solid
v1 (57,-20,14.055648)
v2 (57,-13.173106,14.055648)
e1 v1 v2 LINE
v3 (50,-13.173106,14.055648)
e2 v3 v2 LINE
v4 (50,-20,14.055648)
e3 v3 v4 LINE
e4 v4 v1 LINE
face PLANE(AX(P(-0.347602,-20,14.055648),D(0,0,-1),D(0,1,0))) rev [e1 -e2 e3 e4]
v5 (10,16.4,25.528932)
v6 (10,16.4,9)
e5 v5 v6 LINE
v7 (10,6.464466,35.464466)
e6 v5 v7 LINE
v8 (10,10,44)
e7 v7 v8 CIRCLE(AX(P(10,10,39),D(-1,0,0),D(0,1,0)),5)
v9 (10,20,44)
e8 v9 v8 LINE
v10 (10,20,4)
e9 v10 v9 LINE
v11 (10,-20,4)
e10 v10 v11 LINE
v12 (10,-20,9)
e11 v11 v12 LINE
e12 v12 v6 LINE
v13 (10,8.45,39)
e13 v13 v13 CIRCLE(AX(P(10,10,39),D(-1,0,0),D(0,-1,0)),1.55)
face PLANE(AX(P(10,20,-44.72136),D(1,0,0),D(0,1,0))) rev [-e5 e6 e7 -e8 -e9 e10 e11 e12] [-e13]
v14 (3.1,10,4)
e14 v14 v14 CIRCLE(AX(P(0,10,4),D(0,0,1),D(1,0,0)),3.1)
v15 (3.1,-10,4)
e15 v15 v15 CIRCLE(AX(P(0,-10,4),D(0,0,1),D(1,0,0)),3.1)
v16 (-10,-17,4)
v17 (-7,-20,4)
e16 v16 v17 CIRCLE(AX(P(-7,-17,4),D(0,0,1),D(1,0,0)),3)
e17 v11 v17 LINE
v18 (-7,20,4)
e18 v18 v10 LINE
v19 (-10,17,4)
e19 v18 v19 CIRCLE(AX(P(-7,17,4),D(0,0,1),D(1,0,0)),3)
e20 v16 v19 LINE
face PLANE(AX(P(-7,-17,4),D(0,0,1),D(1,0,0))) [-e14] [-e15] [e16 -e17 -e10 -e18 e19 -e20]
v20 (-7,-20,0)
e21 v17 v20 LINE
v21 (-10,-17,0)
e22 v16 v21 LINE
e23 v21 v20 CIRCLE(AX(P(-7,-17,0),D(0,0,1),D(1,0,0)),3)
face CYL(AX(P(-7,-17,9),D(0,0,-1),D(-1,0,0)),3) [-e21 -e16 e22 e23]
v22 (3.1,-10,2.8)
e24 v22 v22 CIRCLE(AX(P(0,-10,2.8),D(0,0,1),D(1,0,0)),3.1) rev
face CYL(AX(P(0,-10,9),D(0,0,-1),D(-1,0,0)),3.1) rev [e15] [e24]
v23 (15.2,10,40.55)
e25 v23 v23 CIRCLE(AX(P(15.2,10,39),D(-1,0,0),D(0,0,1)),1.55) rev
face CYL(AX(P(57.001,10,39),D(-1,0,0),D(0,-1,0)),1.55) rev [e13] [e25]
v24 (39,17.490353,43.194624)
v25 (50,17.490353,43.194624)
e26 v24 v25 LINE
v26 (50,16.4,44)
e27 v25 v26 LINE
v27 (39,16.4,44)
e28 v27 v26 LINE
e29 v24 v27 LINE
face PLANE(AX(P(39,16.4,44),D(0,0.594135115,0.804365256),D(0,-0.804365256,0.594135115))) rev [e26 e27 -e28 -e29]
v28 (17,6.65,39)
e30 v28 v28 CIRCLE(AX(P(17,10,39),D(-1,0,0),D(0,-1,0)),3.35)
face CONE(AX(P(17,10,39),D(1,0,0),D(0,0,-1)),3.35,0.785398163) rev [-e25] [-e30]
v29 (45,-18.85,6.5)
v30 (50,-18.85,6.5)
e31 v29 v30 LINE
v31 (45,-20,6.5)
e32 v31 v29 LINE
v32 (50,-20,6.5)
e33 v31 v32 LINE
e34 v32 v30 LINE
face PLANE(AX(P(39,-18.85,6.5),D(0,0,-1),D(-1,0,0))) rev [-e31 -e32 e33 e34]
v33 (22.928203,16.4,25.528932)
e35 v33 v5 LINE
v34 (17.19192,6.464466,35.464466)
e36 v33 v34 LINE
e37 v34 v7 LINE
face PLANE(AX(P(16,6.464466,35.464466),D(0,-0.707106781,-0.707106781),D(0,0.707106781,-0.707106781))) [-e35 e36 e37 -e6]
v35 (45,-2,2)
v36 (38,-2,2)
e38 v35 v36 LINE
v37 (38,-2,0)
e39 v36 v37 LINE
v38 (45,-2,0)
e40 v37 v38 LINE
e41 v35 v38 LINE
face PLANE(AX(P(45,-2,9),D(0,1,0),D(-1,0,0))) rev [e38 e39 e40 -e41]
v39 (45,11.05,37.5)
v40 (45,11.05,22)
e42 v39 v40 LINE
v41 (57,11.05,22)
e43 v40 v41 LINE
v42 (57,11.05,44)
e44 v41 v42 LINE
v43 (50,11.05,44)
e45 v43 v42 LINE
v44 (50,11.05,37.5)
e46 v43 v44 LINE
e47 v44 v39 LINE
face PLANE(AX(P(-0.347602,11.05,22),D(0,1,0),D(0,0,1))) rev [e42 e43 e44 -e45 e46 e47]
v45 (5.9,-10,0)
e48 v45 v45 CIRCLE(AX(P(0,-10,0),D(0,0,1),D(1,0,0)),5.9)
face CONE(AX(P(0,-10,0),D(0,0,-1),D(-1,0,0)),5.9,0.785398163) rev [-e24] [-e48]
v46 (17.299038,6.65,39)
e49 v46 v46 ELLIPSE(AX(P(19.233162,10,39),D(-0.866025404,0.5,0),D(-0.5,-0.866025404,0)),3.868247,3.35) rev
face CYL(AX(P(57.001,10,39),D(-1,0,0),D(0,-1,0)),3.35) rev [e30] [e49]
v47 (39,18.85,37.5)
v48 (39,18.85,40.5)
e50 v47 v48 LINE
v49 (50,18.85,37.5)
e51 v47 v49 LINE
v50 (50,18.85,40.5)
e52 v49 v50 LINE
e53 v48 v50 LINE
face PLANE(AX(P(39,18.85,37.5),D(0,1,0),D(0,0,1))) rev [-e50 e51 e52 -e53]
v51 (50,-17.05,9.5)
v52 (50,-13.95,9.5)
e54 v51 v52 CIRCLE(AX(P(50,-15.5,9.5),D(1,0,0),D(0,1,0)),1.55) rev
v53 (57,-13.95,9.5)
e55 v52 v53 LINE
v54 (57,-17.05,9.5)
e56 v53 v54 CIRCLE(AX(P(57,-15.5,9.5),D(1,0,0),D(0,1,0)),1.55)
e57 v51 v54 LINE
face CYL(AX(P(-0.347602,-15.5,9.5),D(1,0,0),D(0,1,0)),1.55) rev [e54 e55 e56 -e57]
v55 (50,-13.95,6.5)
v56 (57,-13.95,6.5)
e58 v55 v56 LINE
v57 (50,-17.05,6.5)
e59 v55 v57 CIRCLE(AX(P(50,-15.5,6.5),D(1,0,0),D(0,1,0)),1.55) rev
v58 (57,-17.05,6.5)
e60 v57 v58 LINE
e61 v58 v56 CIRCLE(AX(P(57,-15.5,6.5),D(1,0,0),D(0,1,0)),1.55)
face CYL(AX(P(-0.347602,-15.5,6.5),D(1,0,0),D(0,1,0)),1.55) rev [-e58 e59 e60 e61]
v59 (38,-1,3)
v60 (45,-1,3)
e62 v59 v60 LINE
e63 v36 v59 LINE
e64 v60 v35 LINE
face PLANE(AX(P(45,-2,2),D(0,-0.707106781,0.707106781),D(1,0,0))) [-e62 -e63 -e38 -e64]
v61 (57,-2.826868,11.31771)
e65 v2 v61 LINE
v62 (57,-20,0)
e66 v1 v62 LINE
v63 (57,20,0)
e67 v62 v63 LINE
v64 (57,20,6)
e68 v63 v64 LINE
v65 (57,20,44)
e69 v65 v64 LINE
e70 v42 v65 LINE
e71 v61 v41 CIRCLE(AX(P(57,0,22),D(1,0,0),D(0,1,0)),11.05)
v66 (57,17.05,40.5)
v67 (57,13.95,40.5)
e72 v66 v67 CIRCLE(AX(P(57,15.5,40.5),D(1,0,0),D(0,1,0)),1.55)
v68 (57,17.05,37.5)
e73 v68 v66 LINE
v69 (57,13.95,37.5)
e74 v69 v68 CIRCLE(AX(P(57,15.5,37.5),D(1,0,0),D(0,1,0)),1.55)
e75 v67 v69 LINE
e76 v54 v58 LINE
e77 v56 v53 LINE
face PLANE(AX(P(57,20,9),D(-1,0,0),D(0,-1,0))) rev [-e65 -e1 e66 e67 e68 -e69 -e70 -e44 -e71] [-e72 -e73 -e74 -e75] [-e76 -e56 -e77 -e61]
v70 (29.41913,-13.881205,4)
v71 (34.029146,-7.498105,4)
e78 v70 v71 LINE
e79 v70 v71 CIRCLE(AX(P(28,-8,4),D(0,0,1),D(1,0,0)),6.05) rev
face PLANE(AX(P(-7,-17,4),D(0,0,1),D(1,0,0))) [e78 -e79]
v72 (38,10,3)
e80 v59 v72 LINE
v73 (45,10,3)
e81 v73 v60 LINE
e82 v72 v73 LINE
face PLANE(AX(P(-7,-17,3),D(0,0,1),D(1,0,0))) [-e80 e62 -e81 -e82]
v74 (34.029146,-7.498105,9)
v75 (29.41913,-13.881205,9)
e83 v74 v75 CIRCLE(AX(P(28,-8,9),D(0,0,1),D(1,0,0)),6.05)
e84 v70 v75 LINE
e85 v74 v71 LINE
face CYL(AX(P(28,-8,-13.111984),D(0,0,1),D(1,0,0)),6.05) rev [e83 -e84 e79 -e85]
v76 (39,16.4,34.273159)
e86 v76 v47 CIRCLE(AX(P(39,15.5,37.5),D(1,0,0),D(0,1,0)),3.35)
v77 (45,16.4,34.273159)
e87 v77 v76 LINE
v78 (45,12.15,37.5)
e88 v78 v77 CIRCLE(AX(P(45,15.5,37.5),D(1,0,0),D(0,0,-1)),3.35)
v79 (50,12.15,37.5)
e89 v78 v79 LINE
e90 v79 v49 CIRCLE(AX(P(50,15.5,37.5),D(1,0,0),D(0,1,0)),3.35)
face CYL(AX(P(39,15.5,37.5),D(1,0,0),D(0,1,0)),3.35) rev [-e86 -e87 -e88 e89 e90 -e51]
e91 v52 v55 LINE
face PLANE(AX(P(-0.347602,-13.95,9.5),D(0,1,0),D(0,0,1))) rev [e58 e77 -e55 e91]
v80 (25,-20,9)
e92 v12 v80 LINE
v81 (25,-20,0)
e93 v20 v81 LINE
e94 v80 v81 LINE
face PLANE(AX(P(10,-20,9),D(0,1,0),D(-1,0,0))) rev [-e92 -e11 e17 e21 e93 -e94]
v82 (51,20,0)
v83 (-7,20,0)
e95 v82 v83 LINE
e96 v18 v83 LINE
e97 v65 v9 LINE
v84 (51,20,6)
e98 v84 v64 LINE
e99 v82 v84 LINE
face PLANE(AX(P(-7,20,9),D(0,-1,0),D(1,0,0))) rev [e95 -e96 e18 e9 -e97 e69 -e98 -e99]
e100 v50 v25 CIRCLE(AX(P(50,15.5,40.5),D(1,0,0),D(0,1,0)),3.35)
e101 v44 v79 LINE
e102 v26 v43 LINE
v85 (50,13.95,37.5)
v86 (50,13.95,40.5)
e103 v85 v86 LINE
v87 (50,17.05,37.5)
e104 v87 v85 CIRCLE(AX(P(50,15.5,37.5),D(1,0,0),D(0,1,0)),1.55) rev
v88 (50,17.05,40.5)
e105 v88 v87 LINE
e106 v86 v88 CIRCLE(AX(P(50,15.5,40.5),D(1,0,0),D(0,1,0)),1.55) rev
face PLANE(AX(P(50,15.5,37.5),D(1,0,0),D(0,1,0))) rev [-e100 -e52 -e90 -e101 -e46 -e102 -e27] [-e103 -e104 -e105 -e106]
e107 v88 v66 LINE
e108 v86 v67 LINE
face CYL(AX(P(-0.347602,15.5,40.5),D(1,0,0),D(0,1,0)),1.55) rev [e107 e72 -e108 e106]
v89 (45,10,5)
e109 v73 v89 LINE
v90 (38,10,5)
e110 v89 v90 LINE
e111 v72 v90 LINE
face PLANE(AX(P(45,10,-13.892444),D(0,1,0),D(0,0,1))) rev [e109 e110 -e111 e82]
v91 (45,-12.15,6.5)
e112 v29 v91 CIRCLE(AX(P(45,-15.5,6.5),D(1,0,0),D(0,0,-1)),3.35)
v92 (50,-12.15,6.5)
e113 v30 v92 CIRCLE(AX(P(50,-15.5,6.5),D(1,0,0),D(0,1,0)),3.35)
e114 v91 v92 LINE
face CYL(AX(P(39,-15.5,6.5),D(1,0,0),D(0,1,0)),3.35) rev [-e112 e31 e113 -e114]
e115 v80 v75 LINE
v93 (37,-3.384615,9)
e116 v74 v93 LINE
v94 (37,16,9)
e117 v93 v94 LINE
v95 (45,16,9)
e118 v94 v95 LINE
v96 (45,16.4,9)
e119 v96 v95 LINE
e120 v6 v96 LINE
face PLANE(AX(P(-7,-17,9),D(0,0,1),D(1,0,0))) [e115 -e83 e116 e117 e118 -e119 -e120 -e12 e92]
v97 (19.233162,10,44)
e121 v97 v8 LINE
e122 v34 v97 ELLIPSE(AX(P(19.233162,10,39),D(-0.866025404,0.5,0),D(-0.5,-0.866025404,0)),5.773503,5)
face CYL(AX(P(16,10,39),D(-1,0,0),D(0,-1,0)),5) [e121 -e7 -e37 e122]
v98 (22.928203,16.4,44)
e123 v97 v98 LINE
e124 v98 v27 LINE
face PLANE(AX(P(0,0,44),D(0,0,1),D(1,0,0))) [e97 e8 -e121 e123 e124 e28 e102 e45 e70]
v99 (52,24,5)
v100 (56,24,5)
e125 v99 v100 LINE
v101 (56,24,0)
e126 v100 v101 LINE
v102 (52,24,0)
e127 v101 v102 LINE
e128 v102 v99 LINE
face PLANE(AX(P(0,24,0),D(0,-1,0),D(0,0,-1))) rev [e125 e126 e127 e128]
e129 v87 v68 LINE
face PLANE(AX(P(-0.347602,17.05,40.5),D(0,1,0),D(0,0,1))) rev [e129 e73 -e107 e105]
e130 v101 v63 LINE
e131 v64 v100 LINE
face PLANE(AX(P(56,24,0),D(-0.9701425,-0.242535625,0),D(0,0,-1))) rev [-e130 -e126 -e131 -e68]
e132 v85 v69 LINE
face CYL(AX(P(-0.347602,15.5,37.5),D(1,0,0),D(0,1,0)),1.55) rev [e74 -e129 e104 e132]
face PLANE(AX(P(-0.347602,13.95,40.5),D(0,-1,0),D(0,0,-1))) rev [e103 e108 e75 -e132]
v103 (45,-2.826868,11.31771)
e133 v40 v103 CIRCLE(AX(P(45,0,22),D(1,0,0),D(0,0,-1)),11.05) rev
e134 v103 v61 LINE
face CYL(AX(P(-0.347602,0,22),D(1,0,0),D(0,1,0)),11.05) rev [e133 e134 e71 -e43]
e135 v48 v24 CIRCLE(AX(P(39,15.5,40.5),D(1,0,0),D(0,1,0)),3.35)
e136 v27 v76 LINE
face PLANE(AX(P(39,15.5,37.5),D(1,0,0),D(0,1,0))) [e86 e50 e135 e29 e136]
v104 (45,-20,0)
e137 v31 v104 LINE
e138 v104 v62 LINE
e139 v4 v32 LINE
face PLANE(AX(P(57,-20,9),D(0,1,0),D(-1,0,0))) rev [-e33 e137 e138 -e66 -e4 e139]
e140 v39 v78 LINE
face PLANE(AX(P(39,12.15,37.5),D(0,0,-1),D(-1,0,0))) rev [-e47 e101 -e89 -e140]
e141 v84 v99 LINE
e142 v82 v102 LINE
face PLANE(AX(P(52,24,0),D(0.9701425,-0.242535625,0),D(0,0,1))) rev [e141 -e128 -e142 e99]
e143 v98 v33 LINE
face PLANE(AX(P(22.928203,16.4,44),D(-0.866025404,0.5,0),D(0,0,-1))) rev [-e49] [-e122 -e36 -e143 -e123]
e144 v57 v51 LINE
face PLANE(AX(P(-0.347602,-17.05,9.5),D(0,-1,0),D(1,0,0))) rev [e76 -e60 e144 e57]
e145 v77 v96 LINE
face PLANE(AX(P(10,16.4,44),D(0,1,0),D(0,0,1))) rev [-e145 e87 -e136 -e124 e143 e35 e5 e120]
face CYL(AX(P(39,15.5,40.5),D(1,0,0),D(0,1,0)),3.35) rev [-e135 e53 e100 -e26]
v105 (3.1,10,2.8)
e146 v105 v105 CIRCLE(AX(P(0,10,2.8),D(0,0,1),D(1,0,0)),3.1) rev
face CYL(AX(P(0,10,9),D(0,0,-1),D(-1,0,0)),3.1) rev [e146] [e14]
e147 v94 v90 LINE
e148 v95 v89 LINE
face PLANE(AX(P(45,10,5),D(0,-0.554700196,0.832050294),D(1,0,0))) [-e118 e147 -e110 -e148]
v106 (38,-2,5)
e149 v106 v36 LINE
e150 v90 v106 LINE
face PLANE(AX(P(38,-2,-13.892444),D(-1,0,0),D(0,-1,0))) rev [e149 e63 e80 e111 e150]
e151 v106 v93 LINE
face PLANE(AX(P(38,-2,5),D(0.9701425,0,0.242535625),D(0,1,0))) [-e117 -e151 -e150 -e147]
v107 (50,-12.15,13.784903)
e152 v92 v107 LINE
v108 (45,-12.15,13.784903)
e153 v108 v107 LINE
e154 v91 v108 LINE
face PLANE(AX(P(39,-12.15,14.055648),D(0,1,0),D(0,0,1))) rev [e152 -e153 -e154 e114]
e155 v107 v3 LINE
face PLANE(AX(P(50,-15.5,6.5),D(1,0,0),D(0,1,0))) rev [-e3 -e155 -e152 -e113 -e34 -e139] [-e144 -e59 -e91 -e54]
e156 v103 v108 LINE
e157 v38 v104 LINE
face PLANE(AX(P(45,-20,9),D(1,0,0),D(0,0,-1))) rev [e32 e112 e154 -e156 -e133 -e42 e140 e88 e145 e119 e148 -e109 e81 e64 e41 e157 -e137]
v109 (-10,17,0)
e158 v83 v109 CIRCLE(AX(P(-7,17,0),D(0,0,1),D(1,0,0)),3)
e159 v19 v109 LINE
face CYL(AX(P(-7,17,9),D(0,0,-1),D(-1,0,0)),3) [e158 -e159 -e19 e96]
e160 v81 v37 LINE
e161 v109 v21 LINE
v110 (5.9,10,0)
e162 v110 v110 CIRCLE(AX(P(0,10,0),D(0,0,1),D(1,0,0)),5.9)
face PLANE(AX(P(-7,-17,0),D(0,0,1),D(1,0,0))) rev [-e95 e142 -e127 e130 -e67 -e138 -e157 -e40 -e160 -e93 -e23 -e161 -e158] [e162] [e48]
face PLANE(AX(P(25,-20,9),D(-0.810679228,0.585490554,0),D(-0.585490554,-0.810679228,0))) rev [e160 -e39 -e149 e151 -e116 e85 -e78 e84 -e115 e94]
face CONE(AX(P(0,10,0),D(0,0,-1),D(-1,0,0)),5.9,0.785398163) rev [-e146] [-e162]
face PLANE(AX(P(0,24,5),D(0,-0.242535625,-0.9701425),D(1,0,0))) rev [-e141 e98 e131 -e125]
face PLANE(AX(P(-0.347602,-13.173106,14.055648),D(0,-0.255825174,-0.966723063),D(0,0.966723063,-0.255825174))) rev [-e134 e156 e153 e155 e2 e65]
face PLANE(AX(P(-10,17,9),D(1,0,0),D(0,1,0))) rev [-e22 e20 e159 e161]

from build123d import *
from OCP.BRepFilletAPI import BRepFilletAPI_MakeChamfer

# Parameters (mm, degrees)
SKETCH1_R           = 3.1
BOSS_EXTRUDE1_DEPTH = 9
SKETCH2_W           = 20
SKETCH2_H           = 40
CUT_EXTRUDE1_DEPTH  = 5
SKETCH3_R           = 6.05
CUT_EXTRUDE2_DEPTH  = 5
BOSS_EXTRUDE2_DEPTH = 35
SKETCH5_W           = 7
SKETCH5_H           = 12
CUT_EXTRUDE3_DEPTH  = 6
CHAMFER1_SIZE       = 6
CHAMFER1_SIZE2      = 4
CHAMFER2_SIZE       = 1
CUT_EXTRUDE4_DEPTH  = 12
CUT_EXTRUDE5_START  = -7
CUT_EXTRUDE5_DEPTH  = 11
SKETCH8_W           = 6
SKETCH8_H           = 6
BOSS_EXTRUDE3_DEPTH = 4
CHAMFER5_SIZE       = 4
CHAMFER5_SIZE_2     = 1
CHAMFER6_SIZE       = 1
CHAMFER6_SIZE2      = 4
CHAMFER7_SIZE       = 2.8
BOSS_EXTRUDE4_DEPTH = 6
CHAMFER8_START      = 16
CHAMFER8_DEPTH      = 0.515103423
CHAMFER8_START_2    = 16.515103423
CHAMFER8_2_DEPTH    = 6.413099807
CHAMFER8_START_3    = 11.656406461
CHAMFER8_3_DEPTH    = 6.343593539
CUT_EXTRUDE6_REACH  = 70.71
SKETCH10_R          = 1.55
CUT_EXTRUDE7_REACH  = 77.71
CUT_EXTRUDE7_START  = -7
SKETCH11_R          = 3.35
CHAMFER9_SIZE       = 1.8


with BuildPart() as part:
    # Sketch1 → Boss-Extrude1 (new body)
    with BuildSketch(Plane.XY):
        with BuildLine():
            Line((-10, 17), (-10, -17))
            ThreePointArc((-10, -17), (-9.121320344, -19.121320344), (-7, -20))
            Line((-7, -20), (10, -20))
            Line((10, -20), (25, -20))
            Line((25, -20), (38, -2))
            Line((38, -2), (45, -2))
            Line((45, -2), (45, -20))
            Line((45, -20), (57, -20))
            Line((57, -20), (57, 20))
            Line((57, 20), (-7, 20))
            ThreePointArc((-7, 20), (-9.121320344, 19.121320344), (-10, 17))
        make_face()
        with Locations((0, 10)):
            Circle(SKETCH1_R, mode=Mode.SUBTRACT)
        with Locations((0, -10)):
            Circle(SKETCH1_R, mode=Mode.SUBTRACT)
    extrude(amount=BOSS_EXTRUDE1_DEPTH)

    # Sketch2 → Cut-Extrude1 (cut)
    with BuildSketch(Plane.XY.offset(9)):
        Rectangle(SKETCH2_W, SKETCH2_H)
    extrude(amount=-CUT_EXTRUDE1_DEPTH, mode=Mode.SUBTRACT)

    # Sketch3 → Cut-Extrude2 (cut)
    with BuildSketch(Plane.XY.offset(9)):
        with Locations((28, -8)):
            Circle(SKETCH3_R)
    extrude(amount=-CUT_EXTRUDE2_DEPTH, mode=Mode.SUBTRACT)

    # Sketch4 → Boss-Extrude2 (add)
    with BuildSketch(Plane.XY.offset(9)):
        Polygon((45, -20), (57, -20), (57, 20), (10, 20), (10, 16.4), (45, 16.4), align=None)
    extrude(amount=BOSS_EXTRUDE2_DEPTH)

    # Sketch5 → Cut-Extrude3 (cut)
    with BuildSketch(Plane.XY.offset(9)):
        with Locations((41.5, 4)):
            Rectangle(SKETCH5_W, SKETCH5_H)
    extrude(amount=-CUT_EXTRUDE3_DEPTH, mode=Mode.SUBTRACT)

    # Chamfer1
    chamfer1_edges = [part.edges().sort_by_distance(p)[0] for p in [
        (41.5, 10, 9),
    ]]
    chamfer1_side = [part.faces().sort_by_distance(p)[0] for p in [
        (23.115817962, 1.462286031, 9),
    ]]
    chamfer(chamfer1_edges, length=CHAMFER1_SIZE, length2=CHAMFER1_SIZE2, reference=chamfer1_side[0])

    # Chamfer2
    chamfer2_edges = [part.edges().sort_by_distance(p)[0] for p in [
        (41.5, -2, 3),
    ]]
    chamfer(chamfer2_edges, length=CHAMFER2_SIZE)

    # Sketch6 → Cut-Extrude4 (cut)
    with BuildSketch(Plane(origin=(57, 0, 0), x_dir=(0, 0, -1), z_dir=(1, 0, 0))):
        with BuildLine():
            Line((-22, 11.05), (-44, 11.05))
            Line((-44, 11.05), (-44, -20))
            Line((-44, -20), (-14.055648488, -20))
            Line((-14.055648488, -20), (-14.055648488, -13.173106135))
            Line((-14.055648488, -13.173106135), (-11.317710156, -2.826868177))
            ThreePointArc((-11.317710156, -2.826868177), (-13.243876618, 6.740385992), (-22, 11.05))
        make_face()
        with BuildLine():
            Line((-40.5, 17.05), (-37.5, 17.05))
            ThreePointArc((-37.5, 17.05), (-35.95, 15.5), (-37.5, 13.95))
            Line((-37.5, 13.95), (-40.5, 13.95))
            ThreePointArc((-40.5, 13.95), (-42.05, 15.5), (-40.5, 17.05))
        make_face()
        with BuildLine():
            Line((-9.5, -17.05), (-6.5, -17.05))
            ThreePointArc((-6.5, -17.05), (-4.95, -15.5), (-6.5, -13.95))
            Line((-6.5, -13.95), (-9.5, -13.95))
            ThreePointArc((-9.5, -13.95), (-11.05, -15.5), (-9.5, -17.05))
        make_face()
    extrude(amount=-CUT_EXTRUDE4_DEPTH, mode=Mode.SUBTRACT)

    # Sketch7 → Cut-Extrude5 (cut)
    with BuildSketch(Plane(origin=(57, 0, 0), x_dir=(0, 0, -1), z_dir=(1, 0, 0)).offset(CUT_EXTRUDE5_START)):
        with BuildLine():
            Line((-6.5, -18.85), (-6.5, -20))
            Line((-6.5, -20), (-14.055648488, -20))
            Line((-14.055648488, -20), (-14.055648488, -12.15))
            Line((-14.055648488, -12.15), (-6.5, -12.15))
            ThreePointArc((-6.5, -12.15), (-3.15, -15.5), (-6.5, -18.85))
        make_face()
        with BuildLine():
            Line((-37.5, 18.85), (-40.5, 18.85))
            ThreePointArc((-40.5, 18.85), (-42.009108789, 18.490834443), (-43.194623608, 17.490352635))
            Line((-43.194623608, 17.490352635), (-44, 16.4))
            Line((-44, 16.4), (-44, 11.05))
            Line((-44, 11.05), (-37.5, 11.05))
            Line((-37.5, 11.05), (-37.5, 12.15))
            ThreePointArc((-37.5, 12.15), (-34.15, 15.5), (-37.5, 18.85))
        make_face()
    extrude(amount=-CUT_EXTRUDE5_DEPTH, mode=Mode.SUBTRACT)

    # Sketch8 → Boss-Extrude3 (add)
    with BuildSketch(Plane(origin=(0, 20, 0), x_dir=(1, 0, 0), z_dir=(0, 1, 0))):
        with Locations((54, -3)):
            Rectangle(SKETCH8_W, SKETCH8_H)
    extrude(amount=BOSS_EXTRUDE3_DEPTH)

    # Chamfer5
    chamfer5_edges_1 = [part.edges().sort_by_distance(p)[0] for p in [
        (51, 24, 3),
    ]]
    chamfer5_side_1 = [part.faces().sort_by_distance(p)[0] for p in [
        (51, 23.98, 3),
    ]]
    chamfer5_edges_2 = [part.edges().sort_by_distance(p)[0] for p in [
        (54, 24, 6),
    ]]
    chamfer5_side_2 = [part.faces().sort_by_distance(p)[0] for p in [
        (54, 24, 5.98),
    ]]
    chamfer5_edges_3 = [part.edges().sort_by_distance(p)[0] for p in [
        (57, 24, 3),
    ]]
    chamfer5_side_3 = [part.faces().sort_by_distance(p)[0] for p in [
        (56.98, 24, 3),
    ]]
    chamfer5 = BRepFilletAPI_MakeChamfer(part.part.solid().wrapped)
    for e in chamfer5_edges_1:
        chamfer5.Add(CHAMFER5_SIZE - 0.0001, CHAMFER5_SIZE_2 - 0.0001, e.wrapped, chamfer5_side_1[0].wrapped)
    for e in chamfer5_edges_2:
        chamfer5.Add(CHAMFER5_SIZE_2 - 0.0001, CHAMFER5_SIZE - 0.0001, e.wrapped, chamfer5_side_2[0].wrapped)
    for e in chamfer5_edges_3:
        chamfer5.Add(CHAMFER5_SIZE_2 - 0.0001, CHAMFER5_SIZE - 0.0001, e.wrapped, chamfer5_side_3[0].wrapped)
    add(Compound.cast(chamfer5.Shape()), mode=Mode.REPLACE)  # a hair under: the kernel refuses the full size

    # Chamfer6
    chamfer6_edges = [part.edges().sort_by_distance(p)[0] for p in [
        (38, 7, 9),
    ]]
    chamfer6_side = [part.faces().sort_by_distance(p)[0] for p in [
        (22.148058049, 0.854930368, 9),
    ]]
    chamfer(chamfer6_edges, length=CHAMFER6_SIZE, length2=CHAMFER6_SIZE2, reference=chamfer6_side[0])

    # Chamfer7
    chamfer7_edges = [part.edges().sort_by_distance(p)[0] for p in [
        (-3.1, 10, 0),
        (-3.1, -10, 0),
    ]]
    chamfer(chamfer7_edges, length=CHAMFER7_SIZE)

    # Sketch9 → Boss-Extrude4 (add)
    with BuildSketch(Plane.ZY.offset(-10)):
        with BuildLine():
            Line((44, 16.4), (44, 10))
            ThreePointArc((44, 10), (40.913417162, 5.380602337), (35.464466094, 6.464466094))
            Line((35.464466094, 6.464466094), (25.528932188, 16.4))
            Line((25.528932188, 16.4), (44, 16.4))
        make_face()
    extrude(amount=-BOSS_EXTRUDE4_DEPTH)

    # Chamfer8: read off the stored shape, not the designer's step
    # Chamfer8 outline → Chamfer8 (add)
    with BuildSketch(Plane.YZ.offset(CHAMFER8_START)):
        with BuildLine():
            ThreePointArc((10, 44), (5.380602337, 40.913417162), (6.464466094, 35.464466094))
            Line((6.464466094, 35.464466094), (16.4, 25.528932188))
            Line((16.4, 25.528932188), (16.4, 44))
            Line((16.4, 44), (10, 44))
        make_face()
    extrude(amount=CHAMFER8_DEPTH)

    # Chamfer8 2 outline → Chamfer8 2 (add)
    with BuildSketch(Plane.YZ.offset(CHAMFER8_START_2)):
        with BuildLine():
            ThreePointArc((10, 44), (5.380602337, 40.913417162), (6.464466094, 35.464466094))
            Line((6.464466094, 35.464466094), (16.4, 25.528932188))
            Line((16.4, 25.528932188), (16.4, 44))
            Line((16.4, 44), (10, 44))
        make_face()
    extrude(amount=CHAMFER8_2_DEPTH)

    # Chamfer8 3 outline → Chamfer8 3 (cut)
    with BuildSketch(Plane(origin=(0, 0, 0), x_dir=(0.500000000000006, 0.8660254037844353, 0), z_dir=(0.8660254037844352, -0.5000000000000061, 0)).offset(CHAMFER8_START_3)):
        with BuildLine():
            add(Edge.make_bspline(
                [(14.194351887, 35.464466094), (4.33836629, 44), (18.276834792, 44)],
                knots=[5.497787144, 5.497787144, 5.497787144, 7.853981634, 7.853981634, 7.853981634], degree=2, weights=[1, 0.382683432, 1]))
            Line((14.194351887, 35.464466094), (25.666918237, 25.528932188))
            Line((25.666918237, 25.528932188), (25.666918237, 44))
            Line((25.666918237, 44), (18.276834792, 44))
        make_face()
    extrude(amount=CHAMFER8_3_DEPTH, mode=Mode.SUBTRACT)

    # Cut-Extrude6: up to this plane
    cut_extrude6_end = Plane(origin=(22.92820323, 16.4, 44), z_dir=(-0.8660254037844355, 0.5000000000000057, 0))
    # Sketch10 → Cut-Extrude6 (cut, up to the surface)
    with BuildSketch(Plane.ZY.offset(-10), mode=Mode.PRIVATE) as cut_extrude6_sk1:
        with Locations(Location((39, 10, 0), (0, 0, 270))):
            Circle(SKETCH10_R)
    cut_extrude6_tool1 = split(extrude(cut_extrude6_sk1.sketch, amount=-CUT_EXTRUDE6_REACH, mode=Mode.PRIVATE), bisect_by=cut_extrude6_end, keep=Keep.BOTH, mode=Mode.PRIVATE)
    add(cut_extrude6_tool1.solids().sort_by_distance((10, 10, 39))[0], mode=Mode.SUBTRACT)

    # Sketch11 → Cut-Extrude7 (cut, up to next)
    with BuildSketch(Plane.ZY.offset(-10).offset(CUT_EXTRUDE7_START), mode=Mode.PRIVATE) as cut_extrude7_sk1:
        with Locations(Location((39, 10, 0), (0, 0, 270))):
            Circle(SKETCH11_R)
    cut_extrude7_tool1 = extrude(cut_extrude7_sk1.sketch, amount=-CUT_EXTRUDE7_REACH, mode=Mode.PRIVATE) & part.part
    add(cut_extrude7_tool1.solids().sort_by_distance((17, 10, 39))[0], mode=Mode.SUBTRACT)

    # Chamfer9
    chamfer9_edges = [part.edges().sort_by_distance(p)[0] for p in [
        (17, 11.55, 39),
    ]]
    chamfer(chamfer9_edges, length=CHAMFER9_SIZE - 0.0001)  # a hair under: the kernel refuses the full size


solid = part.part
